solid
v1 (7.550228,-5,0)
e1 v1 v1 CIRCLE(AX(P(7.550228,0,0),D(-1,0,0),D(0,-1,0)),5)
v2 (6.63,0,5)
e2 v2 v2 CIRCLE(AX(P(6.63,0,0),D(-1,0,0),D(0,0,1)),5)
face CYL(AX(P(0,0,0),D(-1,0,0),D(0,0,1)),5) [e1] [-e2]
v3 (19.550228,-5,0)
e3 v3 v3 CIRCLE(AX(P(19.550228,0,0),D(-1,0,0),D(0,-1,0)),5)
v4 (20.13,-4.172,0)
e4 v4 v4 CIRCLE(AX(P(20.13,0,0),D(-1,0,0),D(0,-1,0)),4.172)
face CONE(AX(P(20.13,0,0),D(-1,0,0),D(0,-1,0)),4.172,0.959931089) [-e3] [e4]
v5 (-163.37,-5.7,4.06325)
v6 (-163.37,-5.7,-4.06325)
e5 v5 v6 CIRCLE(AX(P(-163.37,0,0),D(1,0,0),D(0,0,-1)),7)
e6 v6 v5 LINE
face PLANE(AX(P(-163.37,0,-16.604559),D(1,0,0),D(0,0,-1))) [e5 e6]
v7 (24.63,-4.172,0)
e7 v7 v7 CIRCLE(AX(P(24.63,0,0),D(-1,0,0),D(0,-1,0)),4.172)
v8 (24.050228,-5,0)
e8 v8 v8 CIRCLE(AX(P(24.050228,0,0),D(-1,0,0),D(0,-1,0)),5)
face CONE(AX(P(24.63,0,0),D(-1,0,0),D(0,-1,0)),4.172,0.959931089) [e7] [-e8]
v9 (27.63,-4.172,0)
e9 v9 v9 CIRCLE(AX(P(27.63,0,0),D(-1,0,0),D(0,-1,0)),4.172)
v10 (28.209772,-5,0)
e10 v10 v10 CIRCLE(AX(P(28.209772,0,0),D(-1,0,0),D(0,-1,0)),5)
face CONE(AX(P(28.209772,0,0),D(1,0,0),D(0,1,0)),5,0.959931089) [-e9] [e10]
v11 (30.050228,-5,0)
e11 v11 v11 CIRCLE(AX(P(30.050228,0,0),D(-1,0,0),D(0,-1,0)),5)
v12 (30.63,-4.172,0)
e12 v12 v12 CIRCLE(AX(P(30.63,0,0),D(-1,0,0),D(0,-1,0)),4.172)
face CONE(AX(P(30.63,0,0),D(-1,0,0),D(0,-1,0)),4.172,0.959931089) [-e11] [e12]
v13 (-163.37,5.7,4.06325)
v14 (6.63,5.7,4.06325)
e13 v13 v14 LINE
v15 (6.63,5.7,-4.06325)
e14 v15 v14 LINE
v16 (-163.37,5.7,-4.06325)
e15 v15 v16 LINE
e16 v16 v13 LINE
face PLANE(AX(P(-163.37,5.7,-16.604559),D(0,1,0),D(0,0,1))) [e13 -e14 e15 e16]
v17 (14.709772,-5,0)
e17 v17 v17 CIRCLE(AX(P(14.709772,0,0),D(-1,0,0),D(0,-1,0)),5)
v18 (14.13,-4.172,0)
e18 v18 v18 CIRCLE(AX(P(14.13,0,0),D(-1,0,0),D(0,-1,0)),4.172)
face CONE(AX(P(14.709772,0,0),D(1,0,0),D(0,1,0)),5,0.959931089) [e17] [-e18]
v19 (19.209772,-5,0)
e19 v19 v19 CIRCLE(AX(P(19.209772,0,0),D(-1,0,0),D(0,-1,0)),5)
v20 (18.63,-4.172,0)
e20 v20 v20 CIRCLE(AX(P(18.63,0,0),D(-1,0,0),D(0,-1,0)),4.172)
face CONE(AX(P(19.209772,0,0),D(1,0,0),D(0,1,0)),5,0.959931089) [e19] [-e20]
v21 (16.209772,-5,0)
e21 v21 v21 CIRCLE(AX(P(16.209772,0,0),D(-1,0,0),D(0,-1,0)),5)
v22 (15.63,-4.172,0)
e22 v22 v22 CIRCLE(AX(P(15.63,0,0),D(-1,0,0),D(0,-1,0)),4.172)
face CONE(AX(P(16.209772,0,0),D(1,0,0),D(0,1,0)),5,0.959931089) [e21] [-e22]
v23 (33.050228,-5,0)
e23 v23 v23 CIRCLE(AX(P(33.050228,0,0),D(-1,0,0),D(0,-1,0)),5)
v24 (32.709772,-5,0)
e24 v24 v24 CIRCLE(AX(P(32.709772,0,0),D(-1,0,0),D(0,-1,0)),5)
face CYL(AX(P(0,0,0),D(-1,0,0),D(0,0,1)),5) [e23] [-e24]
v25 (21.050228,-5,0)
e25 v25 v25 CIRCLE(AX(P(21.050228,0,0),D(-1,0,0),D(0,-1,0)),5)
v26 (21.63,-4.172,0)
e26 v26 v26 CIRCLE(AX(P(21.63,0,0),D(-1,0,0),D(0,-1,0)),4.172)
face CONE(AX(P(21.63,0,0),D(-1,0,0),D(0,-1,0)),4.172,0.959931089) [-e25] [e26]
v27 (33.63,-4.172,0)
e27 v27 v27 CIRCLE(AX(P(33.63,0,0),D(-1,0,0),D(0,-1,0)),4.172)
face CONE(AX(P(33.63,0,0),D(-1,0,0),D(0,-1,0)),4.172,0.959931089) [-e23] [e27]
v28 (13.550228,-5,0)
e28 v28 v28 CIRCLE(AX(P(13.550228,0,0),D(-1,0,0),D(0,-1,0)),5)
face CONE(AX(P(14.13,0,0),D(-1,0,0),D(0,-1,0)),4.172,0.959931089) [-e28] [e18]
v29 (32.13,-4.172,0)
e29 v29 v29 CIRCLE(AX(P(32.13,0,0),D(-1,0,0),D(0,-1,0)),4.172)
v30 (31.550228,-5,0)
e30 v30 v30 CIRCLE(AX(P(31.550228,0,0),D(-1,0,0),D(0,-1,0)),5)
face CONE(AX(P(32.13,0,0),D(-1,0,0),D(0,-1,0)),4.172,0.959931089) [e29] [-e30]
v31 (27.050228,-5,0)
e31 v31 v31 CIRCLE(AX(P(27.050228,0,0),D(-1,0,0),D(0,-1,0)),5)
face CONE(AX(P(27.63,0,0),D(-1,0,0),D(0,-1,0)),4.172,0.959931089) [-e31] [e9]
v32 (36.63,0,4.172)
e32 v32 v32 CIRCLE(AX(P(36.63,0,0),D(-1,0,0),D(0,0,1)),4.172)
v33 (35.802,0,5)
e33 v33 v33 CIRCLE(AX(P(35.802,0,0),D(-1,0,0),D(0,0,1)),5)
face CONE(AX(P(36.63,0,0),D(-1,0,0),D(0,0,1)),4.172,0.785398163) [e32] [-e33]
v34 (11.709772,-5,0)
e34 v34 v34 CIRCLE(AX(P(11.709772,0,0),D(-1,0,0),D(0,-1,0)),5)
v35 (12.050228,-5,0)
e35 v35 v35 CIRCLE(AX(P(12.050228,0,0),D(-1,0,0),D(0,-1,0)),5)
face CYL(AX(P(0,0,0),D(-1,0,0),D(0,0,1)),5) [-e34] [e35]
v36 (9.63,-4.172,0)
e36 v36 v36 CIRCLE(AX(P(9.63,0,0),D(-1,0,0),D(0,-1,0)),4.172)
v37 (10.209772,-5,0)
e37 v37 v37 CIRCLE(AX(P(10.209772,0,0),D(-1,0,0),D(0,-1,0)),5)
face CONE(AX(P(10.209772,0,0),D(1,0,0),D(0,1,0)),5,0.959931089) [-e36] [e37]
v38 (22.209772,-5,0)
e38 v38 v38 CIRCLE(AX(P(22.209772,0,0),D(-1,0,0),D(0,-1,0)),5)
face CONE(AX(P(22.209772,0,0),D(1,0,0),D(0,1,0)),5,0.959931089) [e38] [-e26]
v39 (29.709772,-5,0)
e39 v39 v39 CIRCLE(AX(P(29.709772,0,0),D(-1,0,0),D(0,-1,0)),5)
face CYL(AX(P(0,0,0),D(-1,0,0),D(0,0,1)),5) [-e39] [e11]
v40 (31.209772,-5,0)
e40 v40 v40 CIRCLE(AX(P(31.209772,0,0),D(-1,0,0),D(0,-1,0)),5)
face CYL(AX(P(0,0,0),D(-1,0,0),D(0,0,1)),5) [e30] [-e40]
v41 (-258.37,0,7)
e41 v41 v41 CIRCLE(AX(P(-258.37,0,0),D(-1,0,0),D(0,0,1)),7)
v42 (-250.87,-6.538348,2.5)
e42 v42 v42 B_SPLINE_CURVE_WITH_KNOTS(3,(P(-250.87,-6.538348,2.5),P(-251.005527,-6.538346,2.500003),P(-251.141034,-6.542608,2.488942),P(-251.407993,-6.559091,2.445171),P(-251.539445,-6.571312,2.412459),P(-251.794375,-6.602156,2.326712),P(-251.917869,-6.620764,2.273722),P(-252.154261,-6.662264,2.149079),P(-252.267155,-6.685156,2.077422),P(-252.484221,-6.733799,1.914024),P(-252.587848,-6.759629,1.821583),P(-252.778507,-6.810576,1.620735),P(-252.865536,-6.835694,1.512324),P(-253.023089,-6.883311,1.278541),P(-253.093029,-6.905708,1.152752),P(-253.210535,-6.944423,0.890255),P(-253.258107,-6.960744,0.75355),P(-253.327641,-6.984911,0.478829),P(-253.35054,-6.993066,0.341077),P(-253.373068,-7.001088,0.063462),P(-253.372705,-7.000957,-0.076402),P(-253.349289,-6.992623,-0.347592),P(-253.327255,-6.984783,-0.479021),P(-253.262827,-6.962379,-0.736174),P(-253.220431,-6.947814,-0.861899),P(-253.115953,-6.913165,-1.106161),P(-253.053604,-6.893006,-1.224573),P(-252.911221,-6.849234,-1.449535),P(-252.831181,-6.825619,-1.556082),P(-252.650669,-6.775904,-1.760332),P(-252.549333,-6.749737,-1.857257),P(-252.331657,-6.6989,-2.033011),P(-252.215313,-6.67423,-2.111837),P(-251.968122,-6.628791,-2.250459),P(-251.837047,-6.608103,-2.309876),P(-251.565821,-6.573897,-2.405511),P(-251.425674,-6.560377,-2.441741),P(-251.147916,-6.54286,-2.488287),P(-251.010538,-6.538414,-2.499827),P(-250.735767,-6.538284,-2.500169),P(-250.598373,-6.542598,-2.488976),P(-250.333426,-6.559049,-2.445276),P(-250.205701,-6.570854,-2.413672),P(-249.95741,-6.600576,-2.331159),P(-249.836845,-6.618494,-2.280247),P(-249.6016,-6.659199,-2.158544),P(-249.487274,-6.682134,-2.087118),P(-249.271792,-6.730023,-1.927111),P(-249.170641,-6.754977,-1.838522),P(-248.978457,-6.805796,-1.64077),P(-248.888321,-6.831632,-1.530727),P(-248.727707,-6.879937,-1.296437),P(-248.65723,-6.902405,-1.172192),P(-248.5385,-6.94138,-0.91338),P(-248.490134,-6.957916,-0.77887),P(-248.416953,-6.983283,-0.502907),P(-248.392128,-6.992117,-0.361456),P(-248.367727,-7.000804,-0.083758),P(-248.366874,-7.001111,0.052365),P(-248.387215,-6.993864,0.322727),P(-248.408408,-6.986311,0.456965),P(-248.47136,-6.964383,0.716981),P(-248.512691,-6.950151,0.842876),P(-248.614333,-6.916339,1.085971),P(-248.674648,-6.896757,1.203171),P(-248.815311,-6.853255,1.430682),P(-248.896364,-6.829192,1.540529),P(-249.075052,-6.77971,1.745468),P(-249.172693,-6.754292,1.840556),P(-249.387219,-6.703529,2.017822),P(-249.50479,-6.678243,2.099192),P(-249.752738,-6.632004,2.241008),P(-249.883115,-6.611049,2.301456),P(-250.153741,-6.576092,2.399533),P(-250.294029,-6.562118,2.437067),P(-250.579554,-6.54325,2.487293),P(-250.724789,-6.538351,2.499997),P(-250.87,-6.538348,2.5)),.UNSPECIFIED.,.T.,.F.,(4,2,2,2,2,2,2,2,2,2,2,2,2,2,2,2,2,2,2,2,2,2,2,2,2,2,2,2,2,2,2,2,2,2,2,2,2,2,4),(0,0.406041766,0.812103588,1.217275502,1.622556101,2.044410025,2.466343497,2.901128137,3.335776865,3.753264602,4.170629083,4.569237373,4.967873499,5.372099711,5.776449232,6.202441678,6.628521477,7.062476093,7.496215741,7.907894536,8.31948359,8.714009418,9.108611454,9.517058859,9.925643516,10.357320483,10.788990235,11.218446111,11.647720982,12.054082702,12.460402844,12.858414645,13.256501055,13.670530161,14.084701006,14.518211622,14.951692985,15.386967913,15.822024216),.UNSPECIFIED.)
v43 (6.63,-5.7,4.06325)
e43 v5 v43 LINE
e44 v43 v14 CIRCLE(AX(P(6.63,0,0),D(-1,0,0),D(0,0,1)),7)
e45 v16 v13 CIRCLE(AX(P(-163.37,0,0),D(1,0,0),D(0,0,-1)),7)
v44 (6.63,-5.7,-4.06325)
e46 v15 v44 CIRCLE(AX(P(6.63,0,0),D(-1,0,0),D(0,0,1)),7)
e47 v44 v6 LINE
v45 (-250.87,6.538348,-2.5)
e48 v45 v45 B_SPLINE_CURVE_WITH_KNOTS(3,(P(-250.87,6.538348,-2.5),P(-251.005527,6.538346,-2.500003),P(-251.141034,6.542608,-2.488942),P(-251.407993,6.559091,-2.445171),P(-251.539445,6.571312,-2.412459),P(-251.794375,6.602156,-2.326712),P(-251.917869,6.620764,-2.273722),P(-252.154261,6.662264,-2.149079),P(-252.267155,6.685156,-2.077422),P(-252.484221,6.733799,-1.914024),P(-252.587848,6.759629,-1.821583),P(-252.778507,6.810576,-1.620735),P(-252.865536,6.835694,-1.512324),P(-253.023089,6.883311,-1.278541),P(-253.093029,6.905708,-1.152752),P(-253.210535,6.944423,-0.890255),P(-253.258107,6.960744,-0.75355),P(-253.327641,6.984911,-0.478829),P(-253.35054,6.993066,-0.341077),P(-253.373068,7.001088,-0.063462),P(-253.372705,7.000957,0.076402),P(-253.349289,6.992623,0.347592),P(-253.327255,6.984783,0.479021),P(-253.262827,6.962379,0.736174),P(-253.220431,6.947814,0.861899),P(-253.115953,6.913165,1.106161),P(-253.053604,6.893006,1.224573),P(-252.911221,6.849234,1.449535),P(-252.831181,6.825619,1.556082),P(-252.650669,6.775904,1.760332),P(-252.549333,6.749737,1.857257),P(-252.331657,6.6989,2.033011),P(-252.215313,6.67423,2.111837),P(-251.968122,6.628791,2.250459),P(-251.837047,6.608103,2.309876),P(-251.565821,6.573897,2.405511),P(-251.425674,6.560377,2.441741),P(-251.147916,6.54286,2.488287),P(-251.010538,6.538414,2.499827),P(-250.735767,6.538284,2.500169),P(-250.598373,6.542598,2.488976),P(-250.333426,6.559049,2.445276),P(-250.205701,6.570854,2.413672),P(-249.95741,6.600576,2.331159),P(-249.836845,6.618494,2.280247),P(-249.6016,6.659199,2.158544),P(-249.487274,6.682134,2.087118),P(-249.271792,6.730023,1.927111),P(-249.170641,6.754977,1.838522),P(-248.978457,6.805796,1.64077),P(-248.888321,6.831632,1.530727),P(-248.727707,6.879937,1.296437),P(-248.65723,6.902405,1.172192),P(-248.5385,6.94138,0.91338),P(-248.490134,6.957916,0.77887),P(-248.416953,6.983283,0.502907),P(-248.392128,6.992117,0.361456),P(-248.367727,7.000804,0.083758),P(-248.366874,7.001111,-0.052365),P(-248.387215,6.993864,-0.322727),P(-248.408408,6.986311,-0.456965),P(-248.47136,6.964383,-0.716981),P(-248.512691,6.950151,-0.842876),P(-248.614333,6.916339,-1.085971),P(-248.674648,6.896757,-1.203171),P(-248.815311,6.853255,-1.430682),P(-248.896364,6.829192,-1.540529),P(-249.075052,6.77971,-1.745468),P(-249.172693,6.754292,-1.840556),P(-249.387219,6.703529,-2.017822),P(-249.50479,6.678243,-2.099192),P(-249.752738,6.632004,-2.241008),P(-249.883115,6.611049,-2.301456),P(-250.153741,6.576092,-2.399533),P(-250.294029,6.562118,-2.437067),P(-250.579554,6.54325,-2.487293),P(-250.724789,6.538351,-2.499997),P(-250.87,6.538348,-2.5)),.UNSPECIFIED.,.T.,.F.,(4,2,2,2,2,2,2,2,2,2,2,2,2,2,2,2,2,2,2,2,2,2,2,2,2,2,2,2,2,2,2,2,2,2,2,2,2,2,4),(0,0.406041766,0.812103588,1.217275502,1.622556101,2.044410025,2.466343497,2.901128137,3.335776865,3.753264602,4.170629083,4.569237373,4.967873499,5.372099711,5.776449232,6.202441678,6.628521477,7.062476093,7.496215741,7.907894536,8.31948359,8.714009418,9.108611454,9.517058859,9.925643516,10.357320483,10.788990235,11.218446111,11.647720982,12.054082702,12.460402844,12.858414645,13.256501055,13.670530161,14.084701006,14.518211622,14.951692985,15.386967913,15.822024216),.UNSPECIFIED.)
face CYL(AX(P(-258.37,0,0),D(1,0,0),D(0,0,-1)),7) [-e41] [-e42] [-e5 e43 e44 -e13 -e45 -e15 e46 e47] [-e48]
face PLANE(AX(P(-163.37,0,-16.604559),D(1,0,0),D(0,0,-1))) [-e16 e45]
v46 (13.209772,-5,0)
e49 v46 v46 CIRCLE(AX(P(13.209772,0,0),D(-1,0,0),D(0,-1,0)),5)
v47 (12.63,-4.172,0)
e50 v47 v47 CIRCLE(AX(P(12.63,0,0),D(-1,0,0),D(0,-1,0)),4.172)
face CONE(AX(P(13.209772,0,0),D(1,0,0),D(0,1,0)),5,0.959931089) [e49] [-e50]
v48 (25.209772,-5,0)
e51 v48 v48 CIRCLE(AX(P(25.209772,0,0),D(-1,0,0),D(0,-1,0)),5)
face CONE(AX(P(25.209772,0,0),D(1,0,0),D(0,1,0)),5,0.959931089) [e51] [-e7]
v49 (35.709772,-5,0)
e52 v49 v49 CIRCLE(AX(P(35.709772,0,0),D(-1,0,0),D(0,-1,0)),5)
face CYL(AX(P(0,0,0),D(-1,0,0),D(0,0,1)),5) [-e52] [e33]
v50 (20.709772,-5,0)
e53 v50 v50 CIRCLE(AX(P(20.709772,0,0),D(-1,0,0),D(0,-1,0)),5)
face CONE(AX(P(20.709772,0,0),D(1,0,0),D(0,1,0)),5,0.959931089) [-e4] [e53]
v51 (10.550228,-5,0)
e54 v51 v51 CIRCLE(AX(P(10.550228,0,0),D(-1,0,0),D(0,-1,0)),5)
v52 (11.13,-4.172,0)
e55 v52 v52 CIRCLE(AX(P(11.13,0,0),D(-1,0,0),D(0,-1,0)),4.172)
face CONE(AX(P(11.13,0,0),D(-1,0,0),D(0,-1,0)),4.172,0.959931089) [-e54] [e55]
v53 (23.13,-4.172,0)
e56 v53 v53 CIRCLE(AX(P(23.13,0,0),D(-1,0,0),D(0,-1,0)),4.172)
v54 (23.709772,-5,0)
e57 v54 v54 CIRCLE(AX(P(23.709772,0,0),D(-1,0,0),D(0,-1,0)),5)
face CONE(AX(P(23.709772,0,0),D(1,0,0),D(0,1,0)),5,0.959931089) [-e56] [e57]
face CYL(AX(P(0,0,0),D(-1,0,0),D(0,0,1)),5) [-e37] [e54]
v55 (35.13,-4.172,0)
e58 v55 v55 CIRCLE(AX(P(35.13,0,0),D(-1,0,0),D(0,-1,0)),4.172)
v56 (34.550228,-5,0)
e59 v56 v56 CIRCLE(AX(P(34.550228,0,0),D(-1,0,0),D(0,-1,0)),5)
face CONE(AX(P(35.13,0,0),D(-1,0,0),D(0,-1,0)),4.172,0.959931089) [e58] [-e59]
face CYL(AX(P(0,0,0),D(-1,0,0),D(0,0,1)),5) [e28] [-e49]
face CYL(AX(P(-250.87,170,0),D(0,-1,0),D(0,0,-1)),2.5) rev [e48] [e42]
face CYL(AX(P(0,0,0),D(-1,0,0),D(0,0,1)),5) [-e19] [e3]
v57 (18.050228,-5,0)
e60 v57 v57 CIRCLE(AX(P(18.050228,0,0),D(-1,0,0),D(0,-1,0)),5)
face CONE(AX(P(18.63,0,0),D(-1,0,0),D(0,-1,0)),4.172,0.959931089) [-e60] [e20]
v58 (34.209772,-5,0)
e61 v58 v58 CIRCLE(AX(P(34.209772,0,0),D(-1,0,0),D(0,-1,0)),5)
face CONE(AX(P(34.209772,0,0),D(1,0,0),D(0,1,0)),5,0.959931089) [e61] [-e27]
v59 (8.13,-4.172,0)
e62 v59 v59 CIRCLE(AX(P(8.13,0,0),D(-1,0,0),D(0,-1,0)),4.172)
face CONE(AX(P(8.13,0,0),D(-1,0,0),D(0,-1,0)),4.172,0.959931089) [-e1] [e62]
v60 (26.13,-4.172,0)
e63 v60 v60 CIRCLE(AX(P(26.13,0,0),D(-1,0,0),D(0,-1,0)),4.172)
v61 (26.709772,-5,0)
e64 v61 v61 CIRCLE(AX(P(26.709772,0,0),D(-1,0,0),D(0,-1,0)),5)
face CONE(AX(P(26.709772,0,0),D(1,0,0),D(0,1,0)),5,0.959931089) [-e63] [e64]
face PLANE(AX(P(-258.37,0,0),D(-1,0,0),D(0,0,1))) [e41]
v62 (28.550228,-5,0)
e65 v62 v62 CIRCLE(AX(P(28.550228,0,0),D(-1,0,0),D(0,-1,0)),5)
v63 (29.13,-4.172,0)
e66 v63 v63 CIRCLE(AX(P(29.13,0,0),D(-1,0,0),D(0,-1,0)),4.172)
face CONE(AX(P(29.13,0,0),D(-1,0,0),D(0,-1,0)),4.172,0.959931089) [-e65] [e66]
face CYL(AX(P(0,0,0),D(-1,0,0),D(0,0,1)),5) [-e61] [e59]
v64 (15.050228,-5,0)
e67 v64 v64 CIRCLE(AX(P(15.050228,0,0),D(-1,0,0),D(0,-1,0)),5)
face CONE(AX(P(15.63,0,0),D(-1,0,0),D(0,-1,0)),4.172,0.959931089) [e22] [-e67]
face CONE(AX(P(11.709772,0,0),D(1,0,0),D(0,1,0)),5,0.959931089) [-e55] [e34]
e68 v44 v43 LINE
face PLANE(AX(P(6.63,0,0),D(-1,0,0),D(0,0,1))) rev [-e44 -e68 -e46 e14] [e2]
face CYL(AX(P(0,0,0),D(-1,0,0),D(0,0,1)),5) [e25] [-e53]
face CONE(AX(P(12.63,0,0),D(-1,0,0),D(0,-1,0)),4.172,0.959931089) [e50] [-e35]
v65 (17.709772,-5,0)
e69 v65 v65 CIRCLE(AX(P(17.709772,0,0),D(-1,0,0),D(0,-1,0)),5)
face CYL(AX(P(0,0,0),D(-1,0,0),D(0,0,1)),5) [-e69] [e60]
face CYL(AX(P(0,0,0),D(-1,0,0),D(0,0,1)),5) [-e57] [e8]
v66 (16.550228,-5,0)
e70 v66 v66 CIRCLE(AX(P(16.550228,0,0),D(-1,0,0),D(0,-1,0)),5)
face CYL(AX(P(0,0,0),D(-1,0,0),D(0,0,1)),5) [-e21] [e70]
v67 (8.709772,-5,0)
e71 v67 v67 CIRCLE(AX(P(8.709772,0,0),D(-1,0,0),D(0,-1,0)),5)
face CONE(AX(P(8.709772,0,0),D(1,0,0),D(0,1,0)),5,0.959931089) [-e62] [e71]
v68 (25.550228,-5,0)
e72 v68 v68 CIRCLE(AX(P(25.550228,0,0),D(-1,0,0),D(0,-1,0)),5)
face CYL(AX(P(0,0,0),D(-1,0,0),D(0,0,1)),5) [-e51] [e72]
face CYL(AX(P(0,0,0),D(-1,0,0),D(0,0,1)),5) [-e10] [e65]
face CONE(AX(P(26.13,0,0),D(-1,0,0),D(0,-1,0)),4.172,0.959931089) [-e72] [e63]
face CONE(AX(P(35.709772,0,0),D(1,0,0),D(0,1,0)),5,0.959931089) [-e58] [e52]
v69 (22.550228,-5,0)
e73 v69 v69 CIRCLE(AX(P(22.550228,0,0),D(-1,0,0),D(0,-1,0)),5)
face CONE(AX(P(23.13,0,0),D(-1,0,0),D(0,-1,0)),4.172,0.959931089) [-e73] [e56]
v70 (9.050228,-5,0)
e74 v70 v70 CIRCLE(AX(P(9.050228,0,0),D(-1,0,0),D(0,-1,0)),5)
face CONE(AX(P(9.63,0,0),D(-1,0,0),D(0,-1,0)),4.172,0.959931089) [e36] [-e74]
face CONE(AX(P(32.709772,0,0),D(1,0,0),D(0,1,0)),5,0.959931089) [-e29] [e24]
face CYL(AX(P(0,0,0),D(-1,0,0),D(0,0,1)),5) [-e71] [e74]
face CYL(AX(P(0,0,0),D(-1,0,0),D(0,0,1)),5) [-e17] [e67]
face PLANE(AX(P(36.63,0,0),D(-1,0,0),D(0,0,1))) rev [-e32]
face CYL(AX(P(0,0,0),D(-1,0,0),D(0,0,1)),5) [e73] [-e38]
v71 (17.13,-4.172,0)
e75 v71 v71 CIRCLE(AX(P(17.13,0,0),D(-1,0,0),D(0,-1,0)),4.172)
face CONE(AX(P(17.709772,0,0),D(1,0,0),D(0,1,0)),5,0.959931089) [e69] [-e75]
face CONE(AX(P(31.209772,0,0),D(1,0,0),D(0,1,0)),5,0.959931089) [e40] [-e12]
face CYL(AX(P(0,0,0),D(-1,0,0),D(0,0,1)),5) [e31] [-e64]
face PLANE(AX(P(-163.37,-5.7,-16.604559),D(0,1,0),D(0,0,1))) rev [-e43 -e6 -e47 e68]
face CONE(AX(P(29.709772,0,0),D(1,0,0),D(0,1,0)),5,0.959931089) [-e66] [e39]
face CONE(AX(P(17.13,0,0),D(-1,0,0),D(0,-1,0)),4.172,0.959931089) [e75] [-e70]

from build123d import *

# Parameters (mm, degrees)
BASEHEAD_DEPTH                      = 6.63
INDENT_OUTLINE_R                    = 7
INDENT_DEPTH                        = 0.82875
SKETCH4_W                           = 0.6
SKETCH4_H                           = 11.237604307
THDSCHPAT_COUNT                     = 19
THDSCHPAT_PITCH                     = 1.5
SKETCH7_R                           = 13.935804787
CUT_EXTRUDE1_DEPTH                  = 10
SKETCH8_R                           = 7
BOSS_EXTRUDE1_DEPTH                 = 265
SKETCH9_W                           = 14.54473127
SKETCH9_H                           = 2.205507465
CUT_EXTRUDE2_DEPTH                  = 170
CUT_EXTRUDE3_REACH                  = 260.56
CUT_EXTRUDE3_END_RADIUS             = 7
SKETCH10_R                          = 2.5
CUT_EXTRUDE3_DIRECTION_2_REACH      = 260.56
CUT_EXTRUDE3_DIRECTION_2_END_RADIUS = 7


# Read off the part's stored shape, not the designer's step: Indent
with BuildPart() as part:
    # Sketch1 → BaseHead (new body)
    with BuildSketch(Plane(origin=(0, 0, 0), x_dir=(0, 0, -1), z_dir=(1, 0, 0))):
        Polygon((8, 4.618802154), (8, -4.618802154), (0, -9.237604307), (-8, -4.618802154), (-8, 4.618802154), (0, 9.237604307), align=None)
    extrude(amount=BASEHEAD_DEPTH)

    # BodySke → BaseBody (revolve)
    with BuildSketch(Plane.XY, mode=Mode.PRIVATE) as basebody_sk:
        Polygon((0, 0), (36.63, 0), (36.63, 4.172), (35.802, 5), (0, 5), align=None)
    revolve(basebody_sk.sketch.rotate(Axis((0, 0, 0), (1, 0, 0)), 90), axis=Axis((0, 0, 0), (1, 0, 0)))

    # Indent outline → Indent (cut)
    with BuildSketch(Plane.YZ):
        with Locations((0.192376607, 0.033212245)):
            Circle(INDENT_OUTLINE_R)
    extrude(amount=INDENT_DEPTH, mode=Mode.SUBTRACT)

    # Sketch3 → HeadChamfer (revolve, cut)
    with BuildSketch(Plane.XY):
        Polygon((0, 8), (3.601282526, 14.237604307), (3.601282526, 19.237604307), (-10, 19.237604307), (-10, 8), align=None)
    revolve(axis=Axis((0, 0, 0), (1, 0, 0)), mode=Mode.SUBTRACT)

    # Sketch4 → BearingFace (revolve, cut)
    with BuildSketch(Plane.XY, mode=Mode.PRIVATE) as bearingface_sk:
        with Locations((6.33, 13.618802154)):
            Rectangle(SKETCH4_W, SKETCH4_H)
    revolve(bearingface_sk.sketch.rotate(Axis((0, 0, 0), (1, 0, 0)), 270), axis=Axis((0, 0, 0), (1, 0, 0)), mode=Mode.SUBTRACT)

    # ThdSchSke → ThreadSchematic (revolve, cut)
    with BuildSketch(Plane.XY):
        Polygon((8.13, -4.172), (7.550228158, -5), (7.550228158, -6.25), (8.709771842, -6.25), (8.709771842, -5), align=None)
    threadschematic = revolve(axis=Axis((-3.175, 0, 0), (1, 0, 0)), mode=Mode.SUBTRACT)

    # ThdSchPat: ThreadSchematic ×19
    with Locations(*[(i * THDSCHPAT_PITCH, 0, 0) for i in range(1, THDSCHPAT_COUNT)]):
        add(threadschematic, mode=Mode.SUBTRACT)

    # Sketch7 → Cut-Extrude1 (cut)
    with BuildSketch(Plane(origin=(6.63, 0, 0), x_dir=(0, 0, -1), z_dir=(1, 0, 0))):
        Circle(SKETCH7_R)
    extrude(amount=-CUT_EXTRUDE1_DEPTH, mode=Mode.SUBTRACT)

    # Sketch8 → Boss-Extrude1 (add)
    with BuildSketch(Plane.ZY.offset(-6.63)):
        Circle(SKETCH8_R)
    extrude(amount=BOSS_EXTRUDE1_DEPTH)

    # Sketch9 → Cut-Extrude2 (cut)
    with BuildSketch(Plane(origin=(6.63, 0, 0), x_dir=(0, 0, -1), z_dir=(1, 0, 0))):
        with Locations((-1.022041736, -6.802753733)):
            Rectangle(SKETCH9_W, SKETCH9_H)
        with Locations((-1.022041736, 6.802753733)):
            Rectangle(SKETCH9_W, SKETCH9_H)
    extrude(amount=-CUT_EXTRUDE2_DEPTH, mode=Mode.SUBTRACT)

    # Cut-Extrude3: up to this cylinder (the profile starts inside it)
    cut_extrude3_end = Plane(origin=(-250.87, 0, 0), z_dir=(1, 0, 0)) * Cylinder(CUT_EXTRUDE3_END_RADIUS, 536.12, mode=Mode.PRIVATE)
    # Sketch10 → Cut-Extrude3 (cut, up to the surface)
    with BuildSketch(Plane(origin=(0, 0, 0), x_dir=(1, 0, 0), z_dir=(0, 1, 0)), mode=Mode.PRIVATE) as cut_extrude3_sk1:
        with Locations(Location((-250.87, 0, 0), (0, 0, 90))):
            Circle(SKETCH10_R)
    cut_extrude3_tool1 = extrude(cut_extrude3_sk1.sketch, amount=-CUT_EXTRUDE3_REACH, mode=Mode.PRIVATE) & cut_extrude3_end
    add(cut_extrude3_tool1.solids().sort_by_distance((-250.87, 0, 0))[0], mode=Mode.SUBTRACT)

    # Cut-Extrude3 direction 2: up to this cylinder (the profile starts inside it)
    cut_extrude3_direction_2_end = Plane(origin=(-250.87, 0, 0), z_dir=(1, 0, 0)) * Cylinder(CUT_EXTRUDE3_DIRECTION_2_END_RADIUS, 536.12, mode=Mode.PRIVATE)
    # Sketch10 → Cut-Extrude3 direction 2 (cut, up to the surface)
    with BuildSketch(Plane(origin=(0, 0, 0), x_dir=(1, 0, 0), z_dir=(0, 1, 0)), mode=Mode.PRIVATE) as cut_extrude3_direction_2_sk1:
        with Locations(Location((-250.87, 0, 0), (0, 0, 90))):
            Circle(SKETCH10_R)
    cut_extrude3_direction_2_tool1 = extrude(cut_extrude3_direction_2_sk1.sketch, amount=CUT_EXTRUDE3_DIRECTION_2_REACH, mode=Mode.PRIVATE) & cut_extrude3_direction_2_end
    add(cut_extrude3_direction_2_tool1.solids().sort_by_distance((-250.87, 0, 0))[0], mode=Mode.SUBTRACT)


solid = part.part
